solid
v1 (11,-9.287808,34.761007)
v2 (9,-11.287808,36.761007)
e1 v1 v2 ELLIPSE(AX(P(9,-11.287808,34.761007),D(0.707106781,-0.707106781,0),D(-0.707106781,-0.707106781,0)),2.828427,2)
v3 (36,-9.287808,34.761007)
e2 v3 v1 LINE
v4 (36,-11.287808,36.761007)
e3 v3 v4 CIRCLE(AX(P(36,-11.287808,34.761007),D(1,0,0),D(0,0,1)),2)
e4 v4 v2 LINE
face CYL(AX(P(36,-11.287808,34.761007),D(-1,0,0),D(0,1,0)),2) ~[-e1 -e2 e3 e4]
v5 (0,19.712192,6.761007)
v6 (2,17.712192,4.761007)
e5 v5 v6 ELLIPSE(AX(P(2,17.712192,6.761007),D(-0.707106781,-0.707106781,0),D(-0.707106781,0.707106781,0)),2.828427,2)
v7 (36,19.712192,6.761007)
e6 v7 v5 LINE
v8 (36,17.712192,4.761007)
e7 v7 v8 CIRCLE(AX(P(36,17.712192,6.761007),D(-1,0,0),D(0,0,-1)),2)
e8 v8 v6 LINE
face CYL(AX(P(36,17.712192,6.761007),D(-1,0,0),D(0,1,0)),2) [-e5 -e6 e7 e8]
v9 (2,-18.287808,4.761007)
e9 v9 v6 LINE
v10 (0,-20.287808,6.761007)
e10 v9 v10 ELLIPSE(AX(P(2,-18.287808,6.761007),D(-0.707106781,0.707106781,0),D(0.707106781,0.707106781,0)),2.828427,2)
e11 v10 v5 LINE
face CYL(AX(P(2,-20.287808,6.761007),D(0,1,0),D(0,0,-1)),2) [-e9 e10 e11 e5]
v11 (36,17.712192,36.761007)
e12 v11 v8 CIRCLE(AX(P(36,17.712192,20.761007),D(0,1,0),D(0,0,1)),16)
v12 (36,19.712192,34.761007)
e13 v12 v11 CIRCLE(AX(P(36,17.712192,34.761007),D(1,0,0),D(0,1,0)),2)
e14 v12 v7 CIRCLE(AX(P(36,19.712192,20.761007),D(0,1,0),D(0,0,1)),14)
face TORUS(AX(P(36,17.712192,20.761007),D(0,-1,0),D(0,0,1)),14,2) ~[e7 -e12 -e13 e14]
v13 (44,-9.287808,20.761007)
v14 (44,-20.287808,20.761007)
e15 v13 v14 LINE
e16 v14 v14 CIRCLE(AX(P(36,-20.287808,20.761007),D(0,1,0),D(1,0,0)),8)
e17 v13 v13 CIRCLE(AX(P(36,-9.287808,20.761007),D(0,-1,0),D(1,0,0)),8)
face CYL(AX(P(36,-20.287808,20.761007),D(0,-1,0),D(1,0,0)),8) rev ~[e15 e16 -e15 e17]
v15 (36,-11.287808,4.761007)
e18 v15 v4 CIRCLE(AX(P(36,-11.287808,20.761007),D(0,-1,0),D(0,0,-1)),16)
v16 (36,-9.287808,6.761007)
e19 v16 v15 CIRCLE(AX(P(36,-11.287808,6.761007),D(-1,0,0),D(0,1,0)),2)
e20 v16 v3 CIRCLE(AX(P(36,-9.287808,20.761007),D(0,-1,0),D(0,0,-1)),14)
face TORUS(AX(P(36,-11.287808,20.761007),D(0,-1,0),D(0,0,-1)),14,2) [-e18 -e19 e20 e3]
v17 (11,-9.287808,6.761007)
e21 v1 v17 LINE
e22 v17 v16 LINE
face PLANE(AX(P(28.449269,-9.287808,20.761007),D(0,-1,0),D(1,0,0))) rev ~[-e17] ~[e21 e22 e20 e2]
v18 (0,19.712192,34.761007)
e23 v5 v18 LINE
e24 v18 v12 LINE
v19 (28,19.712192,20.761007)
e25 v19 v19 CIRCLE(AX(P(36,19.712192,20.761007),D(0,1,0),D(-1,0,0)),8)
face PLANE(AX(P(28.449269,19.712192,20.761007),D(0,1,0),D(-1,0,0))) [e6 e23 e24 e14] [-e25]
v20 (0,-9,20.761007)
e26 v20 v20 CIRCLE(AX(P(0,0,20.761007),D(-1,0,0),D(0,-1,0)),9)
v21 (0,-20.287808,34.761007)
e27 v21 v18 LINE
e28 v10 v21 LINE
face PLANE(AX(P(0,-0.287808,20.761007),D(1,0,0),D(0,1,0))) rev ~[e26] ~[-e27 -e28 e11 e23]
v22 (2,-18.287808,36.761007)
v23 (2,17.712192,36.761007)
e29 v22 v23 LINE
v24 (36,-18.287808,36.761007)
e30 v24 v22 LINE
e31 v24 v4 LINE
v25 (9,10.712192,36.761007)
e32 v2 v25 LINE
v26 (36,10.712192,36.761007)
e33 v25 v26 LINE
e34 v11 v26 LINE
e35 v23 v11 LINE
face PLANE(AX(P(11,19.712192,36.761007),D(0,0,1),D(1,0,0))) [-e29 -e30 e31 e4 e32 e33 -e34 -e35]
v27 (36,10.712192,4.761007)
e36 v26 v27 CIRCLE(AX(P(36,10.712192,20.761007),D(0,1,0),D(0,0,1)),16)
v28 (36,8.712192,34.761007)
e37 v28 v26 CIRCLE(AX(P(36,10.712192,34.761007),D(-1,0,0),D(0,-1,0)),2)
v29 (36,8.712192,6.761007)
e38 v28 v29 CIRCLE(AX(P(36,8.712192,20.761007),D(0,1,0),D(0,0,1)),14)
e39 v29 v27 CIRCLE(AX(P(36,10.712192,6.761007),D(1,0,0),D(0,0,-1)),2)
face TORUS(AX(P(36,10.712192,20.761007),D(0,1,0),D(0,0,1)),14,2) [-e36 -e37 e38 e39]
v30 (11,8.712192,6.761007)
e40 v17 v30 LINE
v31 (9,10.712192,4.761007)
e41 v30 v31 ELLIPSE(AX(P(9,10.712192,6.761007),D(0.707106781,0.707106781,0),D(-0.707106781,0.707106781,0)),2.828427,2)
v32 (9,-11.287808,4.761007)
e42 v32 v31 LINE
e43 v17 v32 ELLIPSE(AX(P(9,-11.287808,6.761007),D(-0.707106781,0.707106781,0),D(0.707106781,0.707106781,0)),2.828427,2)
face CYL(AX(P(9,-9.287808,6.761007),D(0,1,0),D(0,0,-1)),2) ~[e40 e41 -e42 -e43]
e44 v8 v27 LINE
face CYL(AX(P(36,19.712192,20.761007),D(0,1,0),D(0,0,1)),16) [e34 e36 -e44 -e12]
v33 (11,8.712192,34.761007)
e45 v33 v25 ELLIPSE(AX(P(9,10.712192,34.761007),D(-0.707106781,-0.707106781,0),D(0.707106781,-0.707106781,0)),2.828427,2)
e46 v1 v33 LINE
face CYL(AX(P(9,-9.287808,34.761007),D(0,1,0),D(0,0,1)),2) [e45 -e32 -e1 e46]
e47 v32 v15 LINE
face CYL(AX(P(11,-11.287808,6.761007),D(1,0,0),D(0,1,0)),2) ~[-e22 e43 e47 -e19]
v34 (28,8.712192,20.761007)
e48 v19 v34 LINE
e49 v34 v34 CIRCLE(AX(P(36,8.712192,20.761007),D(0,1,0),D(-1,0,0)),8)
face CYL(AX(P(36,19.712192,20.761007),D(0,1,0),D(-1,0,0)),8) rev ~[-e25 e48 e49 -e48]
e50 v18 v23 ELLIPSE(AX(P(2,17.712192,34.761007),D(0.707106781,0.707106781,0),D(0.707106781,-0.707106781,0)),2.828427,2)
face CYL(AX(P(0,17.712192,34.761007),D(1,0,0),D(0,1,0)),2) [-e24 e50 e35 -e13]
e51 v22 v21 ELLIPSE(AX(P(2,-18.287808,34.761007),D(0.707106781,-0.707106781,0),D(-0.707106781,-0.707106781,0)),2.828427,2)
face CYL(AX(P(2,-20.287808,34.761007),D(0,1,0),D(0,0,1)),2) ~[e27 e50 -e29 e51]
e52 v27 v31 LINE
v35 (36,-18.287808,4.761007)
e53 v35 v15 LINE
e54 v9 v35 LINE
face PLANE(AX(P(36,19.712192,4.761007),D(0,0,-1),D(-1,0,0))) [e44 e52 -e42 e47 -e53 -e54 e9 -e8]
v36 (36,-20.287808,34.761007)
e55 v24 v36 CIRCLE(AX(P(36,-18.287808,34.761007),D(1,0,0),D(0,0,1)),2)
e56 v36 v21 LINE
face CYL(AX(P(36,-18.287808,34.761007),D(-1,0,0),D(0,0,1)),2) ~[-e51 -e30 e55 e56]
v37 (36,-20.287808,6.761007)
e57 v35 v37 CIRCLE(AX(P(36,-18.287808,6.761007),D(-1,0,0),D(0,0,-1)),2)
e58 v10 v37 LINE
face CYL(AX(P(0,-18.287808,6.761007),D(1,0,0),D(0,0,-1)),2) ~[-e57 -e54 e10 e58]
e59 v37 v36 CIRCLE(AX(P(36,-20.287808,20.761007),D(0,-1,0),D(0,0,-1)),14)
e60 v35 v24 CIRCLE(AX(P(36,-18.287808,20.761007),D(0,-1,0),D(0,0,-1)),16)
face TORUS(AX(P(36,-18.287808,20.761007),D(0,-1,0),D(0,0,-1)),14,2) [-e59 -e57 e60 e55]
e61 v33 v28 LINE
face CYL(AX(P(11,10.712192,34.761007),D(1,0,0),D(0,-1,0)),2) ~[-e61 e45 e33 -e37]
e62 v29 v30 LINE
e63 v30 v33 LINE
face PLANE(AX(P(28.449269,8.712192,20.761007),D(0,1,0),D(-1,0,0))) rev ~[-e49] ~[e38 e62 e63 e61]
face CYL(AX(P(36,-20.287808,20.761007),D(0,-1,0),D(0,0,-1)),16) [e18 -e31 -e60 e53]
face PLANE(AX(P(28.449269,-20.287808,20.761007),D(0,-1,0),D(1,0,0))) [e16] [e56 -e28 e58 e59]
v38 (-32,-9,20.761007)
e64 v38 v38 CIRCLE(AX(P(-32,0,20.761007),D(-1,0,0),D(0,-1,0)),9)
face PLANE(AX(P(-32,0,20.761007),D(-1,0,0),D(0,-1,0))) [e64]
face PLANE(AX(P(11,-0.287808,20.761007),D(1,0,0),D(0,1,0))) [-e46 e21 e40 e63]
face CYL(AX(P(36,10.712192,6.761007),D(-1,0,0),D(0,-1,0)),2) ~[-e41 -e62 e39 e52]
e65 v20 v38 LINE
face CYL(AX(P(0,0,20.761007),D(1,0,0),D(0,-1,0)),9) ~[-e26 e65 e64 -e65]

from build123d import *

# Parameters (mm, degrees)
F0_W      = 40
F0_H      = 32
F1_DEPTH  = 11
F3_DEPTH  = 11
F4_R      = 8
F5_DEPTH  = 76.2
F7_DEPTH  = 11
F8_R      = 8
F9_DEPTH  = 76.2
F10_R     = 2
F11_R     = 9
F12_DEPTH = 32
F13_R     = 8
F14_DEPTH = 36.068


with BuildPart() as f1:
    # F0 (on Right) → F1 (new body)
    with BuildSketch(Plane.YZ):
        with Locations((-0.2878075466, 20.7610073336)):
            Rectangle(F0_W, F0_H)
    extrude(amount=F1_DEPTH)

    # F2 (on face) → F3 (join)
    with BuildSketch(Plane.XZ.offset(20.2878075466)):
        with BuildLine():
            Line((11, 36.7610073336), (11, 4.7610073336))
            Line((11, 4.7610073336), (36, 4.7610073336))
            ThreePointArc((36, 4.7610073336), (52, 20.7610073336), (36, 36.7610073336))
            Line((36, 36.7610073336), (11, 36.7610073336))
        make_face()
    extrude(amount=-F3_DEPTH)

    # F4 (on face) → F5 (cut)
    with BuildSketch(Plane.XZ.offset(20.2878075466)):
        with Locations((36, 20.7610073336)):
            Circle(F4_R)
    extrude(amount=-F5_DEPTH, mode=Mode.SUBTRACT)

    # F6 (on face) → F7 (join)
    with BuildSketch(Plane(origin=(0, 19.7121924534, 0), x_dir=(-1, 0, 0), z_dir=(0, 1, 0))):
        with BuildLine():
            Line((-11, 4.7610073336), (-11, 36.7610073336))
            Line((-11, 36.7610073336), (-36, 36.7610073336))
            ThreePointArc((-36, 36.7610073336), (-52, 20.7610073336), (-36, 4.7610073336))
            Line((-36, 4.7610073336), (-11, 4.7610073336))
        make_face()
    extrude(amount=-F7_DEPTH)

    # F8 (on face) → F9 (cut)
    with BuildSketch(Plane(origin=(0, 19.7121924534, 0), x_dir=(-1, 0, 0), z_dir=(0, 1, 0))):
        with Locations((-36, 20.7610073336)):
            Circle(F8_R)
    extrude(amount=-F9_DEPTH, mode=Mode.SUBTRACT)

    # F10
    f10_edges = [f1.edges().sort_by_distance(p)[0] for p in [
        (36, 14.212192, 36.761007),
        (36, 14.212192, 4.761007),
        (52, 19.712192, 20.761007),
        (52, 8.712192, 20.761007),
        (36, -14.787808, 4.761007),
        (36, -14.787808, 36.761007),
        (52, -20.287808, 20.761007),
        (52, -9.287808, 20.761007),
        (18, 19.712192, 36.761007),
        (23.5, 8.712192, 36.761007),
        (11, -0.287808, 36.761007),
        (23.5, -9.287808, 36.761007),
        (18, -20.287808, 36.761007),
        (0, -0.287808, 36.761007),
        (18, -20.287808, 4.761007),
        (23.5, -9.287808, 4.761007),
        (11, -0.287808, 4.761007),
        (23.5, 8.712192, 4.761007),
        (18, 19.712192, 4.761007),
        (0, -0.287808, 4.761007),
    ]]
    fillet(f10_edges, radius=F10_R)

    # F11 (on face) → F12 (join)
    with BuildSketch(Plane(origin=(0, 0, 0), x_dir=(0, -1, 0), z_dir=(-1, 0, 0))):
        with Locations((0, 20.7610073336)):
            Circle(F11_R)
    extrude(amount=F12_DEPTH)

    # F13 (on face) → F14 (cut)
    with BuildSketch(Plane(origin=(0, 19.7121924534, 0), x_dir=(-1, 0, 0), z_dir=(0, 1, 0))):
        with Locations((-36, 20.7610073336)):
            Circle(F13_R)
    extrude(amount=-F14_DEPTH, mode=Mode.SUBTRACT)


solid = f1.part
